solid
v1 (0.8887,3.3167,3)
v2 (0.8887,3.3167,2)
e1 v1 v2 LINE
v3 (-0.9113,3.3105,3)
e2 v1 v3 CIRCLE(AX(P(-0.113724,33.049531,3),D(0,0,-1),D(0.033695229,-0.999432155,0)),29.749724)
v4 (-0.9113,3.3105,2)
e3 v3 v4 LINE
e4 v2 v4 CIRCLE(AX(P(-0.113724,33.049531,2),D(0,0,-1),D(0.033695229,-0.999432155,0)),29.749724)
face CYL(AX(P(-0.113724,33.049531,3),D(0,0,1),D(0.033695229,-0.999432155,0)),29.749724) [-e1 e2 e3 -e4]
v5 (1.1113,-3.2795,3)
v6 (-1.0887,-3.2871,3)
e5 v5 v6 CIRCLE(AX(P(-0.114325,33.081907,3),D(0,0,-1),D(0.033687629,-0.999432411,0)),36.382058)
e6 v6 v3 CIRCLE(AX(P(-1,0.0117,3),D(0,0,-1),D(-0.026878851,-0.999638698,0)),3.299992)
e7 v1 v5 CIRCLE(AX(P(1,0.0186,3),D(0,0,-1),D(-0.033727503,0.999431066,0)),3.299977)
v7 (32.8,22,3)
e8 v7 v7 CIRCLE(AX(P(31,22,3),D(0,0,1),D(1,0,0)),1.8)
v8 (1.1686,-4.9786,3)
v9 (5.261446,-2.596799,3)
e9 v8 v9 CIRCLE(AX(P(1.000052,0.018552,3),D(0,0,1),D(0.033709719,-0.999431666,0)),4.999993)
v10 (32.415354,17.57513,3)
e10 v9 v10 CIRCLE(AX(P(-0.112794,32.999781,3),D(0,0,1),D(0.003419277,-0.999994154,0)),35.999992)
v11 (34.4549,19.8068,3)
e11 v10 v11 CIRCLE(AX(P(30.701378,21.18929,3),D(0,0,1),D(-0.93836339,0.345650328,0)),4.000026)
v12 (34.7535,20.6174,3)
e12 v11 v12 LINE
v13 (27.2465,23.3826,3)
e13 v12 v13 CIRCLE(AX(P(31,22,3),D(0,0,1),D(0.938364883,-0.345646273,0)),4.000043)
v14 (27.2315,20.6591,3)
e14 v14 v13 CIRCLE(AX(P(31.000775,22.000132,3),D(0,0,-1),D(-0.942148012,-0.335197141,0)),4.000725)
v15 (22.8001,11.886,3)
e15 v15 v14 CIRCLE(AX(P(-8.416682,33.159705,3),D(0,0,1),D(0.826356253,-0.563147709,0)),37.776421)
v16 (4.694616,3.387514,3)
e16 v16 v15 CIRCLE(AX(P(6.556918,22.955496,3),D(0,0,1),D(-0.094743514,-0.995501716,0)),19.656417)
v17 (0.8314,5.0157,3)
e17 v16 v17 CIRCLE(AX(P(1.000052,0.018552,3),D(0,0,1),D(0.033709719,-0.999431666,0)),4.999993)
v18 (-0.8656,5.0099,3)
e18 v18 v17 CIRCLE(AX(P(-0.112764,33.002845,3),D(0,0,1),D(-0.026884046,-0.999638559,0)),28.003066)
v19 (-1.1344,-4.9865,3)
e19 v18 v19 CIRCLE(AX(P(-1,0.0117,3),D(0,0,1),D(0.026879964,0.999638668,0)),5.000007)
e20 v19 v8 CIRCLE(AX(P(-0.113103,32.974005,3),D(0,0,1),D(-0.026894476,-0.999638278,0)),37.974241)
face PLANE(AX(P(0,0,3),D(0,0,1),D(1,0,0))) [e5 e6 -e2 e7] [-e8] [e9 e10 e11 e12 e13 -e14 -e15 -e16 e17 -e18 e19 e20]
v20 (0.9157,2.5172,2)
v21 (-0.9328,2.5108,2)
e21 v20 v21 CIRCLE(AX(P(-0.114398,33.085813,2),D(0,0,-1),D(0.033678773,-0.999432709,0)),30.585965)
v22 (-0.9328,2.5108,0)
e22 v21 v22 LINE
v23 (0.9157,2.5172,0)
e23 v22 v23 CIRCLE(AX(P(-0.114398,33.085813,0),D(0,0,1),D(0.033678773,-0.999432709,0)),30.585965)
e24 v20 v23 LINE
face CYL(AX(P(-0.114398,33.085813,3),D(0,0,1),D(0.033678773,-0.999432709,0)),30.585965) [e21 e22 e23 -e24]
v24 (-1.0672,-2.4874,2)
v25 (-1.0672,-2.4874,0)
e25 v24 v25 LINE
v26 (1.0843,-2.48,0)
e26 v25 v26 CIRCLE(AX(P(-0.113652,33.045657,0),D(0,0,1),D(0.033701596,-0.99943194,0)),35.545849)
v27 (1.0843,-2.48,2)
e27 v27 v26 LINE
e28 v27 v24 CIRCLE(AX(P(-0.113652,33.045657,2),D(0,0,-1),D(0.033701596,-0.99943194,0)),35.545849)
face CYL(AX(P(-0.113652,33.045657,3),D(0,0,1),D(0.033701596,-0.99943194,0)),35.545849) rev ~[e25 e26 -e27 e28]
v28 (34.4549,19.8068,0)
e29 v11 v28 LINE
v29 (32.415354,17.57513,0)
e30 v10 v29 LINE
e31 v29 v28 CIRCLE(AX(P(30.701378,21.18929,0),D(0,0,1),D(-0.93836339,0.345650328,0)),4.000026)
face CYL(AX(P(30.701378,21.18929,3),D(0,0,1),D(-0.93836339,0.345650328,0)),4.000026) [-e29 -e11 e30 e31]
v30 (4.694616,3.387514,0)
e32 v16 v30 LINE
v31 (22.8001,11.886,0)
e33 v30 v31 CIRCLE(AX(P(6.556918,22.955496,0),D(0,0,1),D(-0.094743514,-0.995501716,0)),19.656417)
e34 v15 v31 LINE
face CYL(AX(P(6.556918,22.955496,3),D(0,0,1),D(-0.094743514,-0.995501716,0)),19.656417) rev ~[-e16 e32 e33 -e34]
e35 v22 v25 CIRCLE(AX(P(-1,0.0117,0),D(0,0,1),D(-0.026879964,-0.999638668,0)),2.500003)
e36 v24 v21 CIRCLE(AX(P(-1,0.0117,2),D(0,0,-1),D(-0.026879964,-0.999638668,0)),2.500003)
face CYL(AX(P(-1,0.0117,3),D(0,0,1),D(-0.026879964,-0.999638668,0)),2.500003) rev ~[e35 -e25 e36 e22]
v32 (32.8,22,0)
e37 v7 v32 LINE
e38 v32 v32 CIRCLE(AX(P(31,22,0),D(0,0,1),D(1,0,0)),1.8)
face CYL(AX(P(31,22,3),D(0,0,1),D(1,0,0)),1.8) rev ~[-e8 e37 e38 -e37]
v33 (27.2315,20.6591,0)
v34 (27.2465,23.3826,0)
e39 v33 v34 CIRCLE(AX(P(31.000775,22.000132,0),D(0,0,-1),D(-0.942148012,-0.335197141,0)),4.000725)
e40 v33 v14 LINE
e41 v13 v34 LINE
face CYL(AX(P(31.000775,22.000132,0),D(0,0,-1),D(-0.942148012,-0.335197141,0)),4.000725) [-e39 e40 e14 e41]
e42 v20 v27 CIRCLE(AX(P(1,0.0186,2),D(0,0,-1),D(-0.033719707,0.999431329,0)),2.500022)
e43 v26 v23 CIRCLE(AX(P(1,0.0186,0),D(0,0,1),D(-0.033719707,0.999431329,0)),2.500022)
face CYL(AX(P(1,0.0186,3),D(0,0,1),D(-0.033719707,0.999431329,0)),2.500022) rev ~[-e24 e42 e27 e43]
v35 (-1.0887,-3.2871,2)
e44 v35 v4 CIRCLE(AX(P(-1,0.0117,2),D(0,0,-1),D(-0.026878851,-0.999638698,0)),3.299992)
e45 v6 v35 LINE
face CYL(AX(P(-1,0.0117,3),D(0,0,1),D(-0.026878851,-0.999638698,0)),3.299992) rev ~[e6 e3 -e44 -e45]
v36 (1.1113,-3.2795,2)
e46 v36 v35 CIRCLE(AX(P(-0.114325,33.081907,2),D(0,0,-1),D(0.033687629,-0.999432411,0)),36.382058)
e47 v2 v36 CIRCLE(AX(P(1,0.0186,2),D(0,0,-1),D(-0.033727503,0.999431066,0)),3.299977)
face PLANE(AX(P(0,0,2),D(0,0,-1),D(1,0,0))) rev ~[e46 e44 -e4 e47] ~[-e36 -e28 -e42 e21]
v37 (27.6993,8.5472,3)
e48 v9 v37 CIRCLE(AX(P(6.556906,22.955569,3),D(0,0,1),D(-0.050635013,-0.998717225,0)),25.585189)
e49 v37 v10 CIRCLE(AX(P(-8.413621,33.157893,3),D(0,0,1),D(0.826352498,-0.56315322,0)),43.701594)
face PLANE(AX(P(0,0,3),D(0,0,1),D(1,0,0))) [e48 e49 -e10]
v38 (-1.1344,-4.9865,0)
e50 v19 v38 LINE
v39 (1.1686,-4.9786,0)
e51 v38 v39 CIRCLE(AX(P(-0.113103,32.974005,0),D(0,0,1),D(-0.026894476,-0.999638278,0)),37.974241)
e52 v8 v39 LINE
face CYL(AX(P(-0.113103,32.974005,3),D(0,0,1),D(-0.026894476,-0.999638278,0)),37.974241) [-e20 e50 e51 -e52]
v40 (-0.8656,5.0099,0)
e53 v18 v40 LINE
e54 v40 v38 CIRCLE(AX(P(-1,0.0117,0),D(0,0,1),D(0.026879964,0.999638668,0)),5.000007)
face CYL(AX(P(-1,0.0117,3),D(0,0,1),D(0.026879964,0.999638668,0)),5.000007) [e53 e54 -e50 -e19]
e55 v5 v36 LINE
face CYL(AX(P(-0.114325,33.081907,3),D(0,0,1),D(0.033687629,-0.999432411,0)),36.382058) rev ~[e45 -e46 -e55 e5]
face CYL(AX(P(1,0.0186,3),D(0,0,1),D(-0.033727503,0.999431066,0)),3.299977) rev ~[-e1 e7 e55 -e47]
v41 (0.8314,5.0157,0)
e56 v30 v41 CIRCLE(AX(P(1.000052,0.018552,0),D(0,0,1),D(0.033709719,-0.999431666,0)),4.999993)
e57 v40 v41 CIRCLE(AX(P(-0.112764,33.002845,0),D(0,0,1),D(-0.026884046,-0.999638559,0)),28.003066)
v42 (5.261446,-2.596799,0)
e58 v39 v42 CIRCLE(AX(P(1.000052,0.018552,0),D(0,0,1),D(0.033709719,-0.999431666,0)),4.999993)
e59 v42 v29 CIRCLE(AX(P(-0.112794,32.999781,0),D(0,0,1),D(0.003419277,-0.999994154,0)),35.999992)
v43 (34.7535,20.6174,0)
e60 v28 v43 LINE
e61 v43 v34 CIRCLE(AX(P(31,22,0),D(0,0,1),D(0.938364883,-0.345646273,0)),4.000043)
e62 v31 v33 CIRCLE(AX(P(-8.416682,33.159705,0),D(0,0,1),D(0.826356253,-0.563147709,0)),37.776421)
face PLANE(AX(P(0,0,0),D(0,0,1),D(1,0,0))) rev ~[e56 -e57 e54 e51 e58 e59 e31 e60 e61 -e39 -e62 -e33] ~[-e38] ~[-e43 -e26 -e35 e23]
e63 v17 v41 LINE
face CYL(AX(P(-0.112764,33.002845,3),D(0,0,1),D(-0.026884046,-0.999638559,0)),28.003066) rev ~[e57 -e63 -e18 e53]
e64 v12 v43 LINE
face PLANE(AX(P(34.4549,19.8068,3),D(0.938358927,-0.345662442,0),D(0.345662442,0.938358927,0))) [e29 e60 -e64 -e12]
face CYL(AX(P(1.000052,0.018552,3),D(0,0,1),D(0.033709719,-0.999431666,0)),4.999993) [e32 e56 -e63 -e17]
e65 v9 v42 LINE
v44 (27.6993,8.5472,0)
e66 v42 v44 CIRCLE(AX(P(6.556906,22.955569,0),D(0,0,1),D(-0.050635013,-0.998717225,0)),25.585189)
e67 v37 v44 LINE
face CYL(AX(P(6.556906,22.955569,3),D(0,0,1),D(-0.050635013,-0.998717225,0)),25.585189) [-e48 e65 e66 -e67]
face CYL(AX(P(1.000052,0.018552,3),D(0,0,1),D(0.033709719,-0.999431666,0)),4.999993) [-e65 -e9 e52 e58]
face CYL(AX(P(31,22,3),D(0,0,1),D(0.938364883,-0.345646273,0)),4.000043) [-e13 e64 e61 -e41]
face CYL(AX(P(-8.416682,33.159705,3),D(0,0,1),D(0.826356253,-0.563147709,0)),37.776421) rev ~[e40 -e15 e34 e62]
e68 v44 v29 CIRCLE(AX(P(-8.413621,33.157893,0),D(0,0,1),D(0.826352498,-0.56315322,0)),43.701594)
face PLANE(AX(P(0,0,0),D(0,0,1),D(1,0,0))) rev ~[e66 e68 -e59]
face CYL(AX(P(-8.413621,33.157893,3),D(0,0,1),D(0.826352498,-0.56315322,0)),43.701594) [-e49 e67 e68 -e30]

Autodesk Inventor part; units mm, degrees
ref_plane "YZ Plane" through (0, 0, 0) normal (1, 0, 0) x (0, 1, 0)
ref_plane "XZ Plane" through (0, 0, 0) normal (0, 1, 0) x (-1, 0, 0)
ref_plane "XY Plane" through (0, 0, 0) normal (0, 0, 1) x (1, 0, 0)
sketch "Sketch1" plane through (0, 0, 0) normal (0, 0, 1) x (1, 0, 0)
  circle A0 centre (31, 22) radius 1.25
  circle A1 centre (31, 22) radius 3
  arc A2 (0, 0) -> (31, 22) centre (-0.1128, 32.9998) ccw construction
  arc A3 (0.0103, -3) -> (33.8284, 21) centre (-0.1128, 32.9998) ccw
  arc A4 (-0.0103, 3) -> (28.1716, 23) centre (-0.1128, 32.9998) ccw
  arc A5 (-0.0103, 3) -> (0.0103, -3) centre (0, 0) ccw
  arc A6 (33.8284, 21) -> (28.1716, 23) centre (31, 22) ccw
  point P0 (41.5332, 21.1583)
  point P1 (35.8668, 23.1312)
  point P2 (33.8284, 21)
  point P3 (28.1716, 23)
  dimension "d1" = 30
  dimension "d21" = 6
  dimension "d22" = 2.5
  dimension "d23" = 31
  dimension "d24" = 22
extrude "Extrusion1" add sketch "Sketch1" along normal blind 3
sketch "Sketch3" plane through (0, 0, 3) normal (0, 0, 1) x (1, 0, 0)
  arc A0 (-1, 0.0117) -> (1, 0.0186) centre (-0.1128, 32.9998) ccw construction
  arc A1 (-1.1344, -4.9865) -> (1.1686, -4.9786) centre (-0.1128, 32.9998) ccw
  arc A2 (-0.8656, 5.0099) -> (0.8314, 5.0157) centre (-0.1128, 32.9998) ccw
  arc A3 (-0.8656, 5.0099) -> (-1.1344, -4.9865) centre (-1, 0.0117) ccw
  arc A4 (1.1686, -4.9786) -> (0.8314, 5.0157) centre (1, 0.0186) ccw
  arc A5 (0.0103, -3) -> (33.8284, 21) centre (-0.1128, 32.9998) ccw projected
  point P0 (0, 0)
  dimension "d31" = 10
  dimension "d32" = 1
  dimension "d33" = 1
extrude "Extrusion3" add sketch "Sketch3" against normal blind 3
sketch "Sketch4" plane through (0, 0, 3) normal (0, 0, -1) x (1, 0, 0)
  arc A0 (-1.1344, 4.9865) -> (-0.8656, -5.0099) centre (-1, -0.0117) ccw projected
  arc A1 (1.1686, 4.9786) -> (-1.1344, 4.9865) centre (-0.1128, -32.9998) ccw projected
  arc A2 (0.8314, -5.0157) -> (-0.8656, -5.0099) centre (-0.1128, -32.9998) ccw projected
  arc A3 (1, -0.0186) -> (-1, -0.0117) centre (-0.1128, -32.9998) ccw construction
  arc A4 (1.0843, 2.48) -> (-1.0672, 2.4874) centre (-0.1128, -32.9998) ccw
  arc A5 (0.9157, -2.5172) -> (-0.9328, -2.5108) centre (-0.1128, -32.9998) ccw
  arc A6 (0.9157, -2.5172) -> (1.0843, 2.48) centre (1, -0.0186) ccw
  arc A7 (-1.0672, 2.4874) -> (-0.9328, -2.5108) centre (-1, -0.0117) ccw
  arc A8 (28.1716, -23) -> (4.6946, -3.3875) centre (-0.1128, -32.9998) ccw projected
  arc A9 (28.1716, -23) -> (33.8284, -21) centre (31, -22) ccw projected
  arc A10 (33.8284, -21) -> (5.2614, 2.5968) centre (-0.1128, -32.9998) ccw projected
  arc A11 (5.2614, 2.5968) -> (1.1686, 4.9786) centre (1, -0.0186) ccw projected
  arc A12 (0.8314, -5.0157) -> (4.6946, -3.3875) centre (1, -0.0186) ccw projected
  arc A13 (0.8887, -3.3167) -> (-0.9113, -3.3105) centre (-0.1128, -32.9998) ccw
  arc A14 (0.8887, -3.3167) -> (1.1113, 3.2795) centre (1, -0.0186) ccw
  arc A15 (1.1113, 3.2795) -> (-1.0887, 3.2871) centre (-0.1128, -32.9998) ccw
  arc A16 (-1.0887, 3.2871) -> (-0.9113, -3.3105) centre (-1, -0.0117) ccw
  point P0 (0, 0)
  dimension "d43" = 5
  dimension "d52" = 0.8
extrude "Extrusion4" cut sketch "Sketch4" along normal through all contours A6 A5 A7 A4
sketch "Sketch5" plane through (0, 0, 3) normal (0, 0, 1) x (1, 0, 0)
  circle A0 centre (31, 22) radius 1.25 projected
  arc A1 (0, 0) -> (31, 22) centre (-0.1128, 32.9998) ccw construction
  arc A2 (34.7535, 20.6174) -> (27.2465, 23.3826) centre (31, 22) ccw
  arc A3 (26.9479, 22.5719) -> (34.4549, 19.8068) centre (30.7014, 21.1893) ccw
  line L0 (30.0441, 21.4413) -> (31.2665, 20.9727)
  line L1 (32.5586, 21.449) -> (29.5201, 22.5232)
  line L2 (26.9479, 22.5719) -> (27.2465, 23.3826)
  line L3 (34.4549, 19.8068) -> (34.7535, 20.6174)
  circle A4 centre (31, 22) radius 1.8
  dimension "d44" = 8
  dimension "d46" = 1.5
  dimension "d47" = 3.6
extrude "Extrusion5" cut sketch "Sketch5" against normal up to surface (3 mm away) contours A4
extrude "Extrusion6" add sketch "Sketch5" against normal up to surface (3 mm away) contours L3 A3 L2 A2
extrude "Extrusion7" cut sketch "Sketch4" along normal blind 1 contours A13 A16 A15 A14
sketch "Sketch6" plane through (0, 0, 0) normal (0, 0, -1) x (-1, 0, 0)
  circle A0 centre (-31, 22) radius 1.8 projected
  arc A1 (-32.4154, 17.5752) -> (-5.2614, -2.5968) centre (0.1128, 32.9998) ccw projected
  arc A2 (-5.2614, -2.5968) -> (-1.1686, -4.9786) centre (-1, 0.0186) ccw projected
  arc A3 (-1.1686, -4.9786) -> (1.1344, -4.9865) centre (0.1128, 32.9998) ccw projected
  arc A4 (1.1344, -4.9865) -> (0.8656, 5.0099) centre (1, 0.0117) ccw projected
  arc A5 (-0.8314, 5.0157) -> (0.8656, 5.0099) centre (0.1128, 32.9998) ccw projected
  arc A6 (-0.8314, 5.0157) -> (-4.6946, 3.3875) centre (-1, 0.0186) ccw projected
  arc A7 (-26.899, 19.9475) -> (-4.6946, 3.3875) centre (0.1128, 32.9998) ccw projected
  arc A8 (-26.899, 19.9475) -> (-26.9479, 22.5719) centre (-30.7014, 21.1893) ccw projected
  line L0 (-26.9479, 22.5719) -> (-27.2465, 23.3826) projected
  arc A9 (-27.2465, 23.3826) -> (-34.7535, 20.6174) centre (-31, 22) ccw projected
  line L1 (-34.7535, 20.6174) -> (-34.4549, 19.8068) projected
  arc A10 (-34.4549, 19.8068) -> (-32.4154, 17.5752) centre (-30.7014, 21.1893) ccw projected
  arc A11 (-1.0843, -2.48) -> (1.0672, -2.4874) centre (0.1128, 32.9998) ccw projected
  arc A12 (-0.9157, 2.5172) -> (-1.0843, -2.48) centre (-1, 0.0186) ccw projected
  arc A13 (-0.9157, 2.5172) -> (0.9328, 2.5108) centre (0.1128, 32.9998) ccw projected
  arc A14 (1.0672, -2.4874) -> (0.9328, 2.5108) centre (1, 0.0117) ccw projected
  arc A15 (-27.2465, 23.3826) -> (-34.7535, 20.6174) centre (-31, 22) ccw projected
  arc A16 (-27.2315, 20.6591) -> (-27.2465, 23.3826) centre (-31, 22) ccw
  arc A17 (-26.899, 19.9475) -> (-4.6946, 3.3875) centre (0.1128, 32.9998) ccw projected
  arc A18 (-27.2315, 20.6591) -> (-26.899, 19.9475) centre (0.1128, 32.9998) ccw
  arc A19 (-26.899, 19.9475) -> (-4.6946, 3.3875) centre (0.1128, 32.9998) ccw projected
  point P0 (0, 0)
extrude "Extrusion8" cut sketch "Sketch6" against normal up to surface (3 mm away) contours L0 A8 A18 A16
sketch "Sketch7" plane through (0, 0, 3) normal (0, 0, 1) x (1, 0, 0)
  arc A0 (34.7535, 20.6174) -> (27.2315, 20.6591) centre (31, 22) ccw projected
  arc A1 (4.6946, 3.3875) -> (27.2315, 20.6591) centre (-0.1128, 32.9998) ccw projected
  arc A2 (4.6946, 3.3875) -> (0.8314, 5.0157) centre (1, 0.0186) ccw projected
  arc A3 (-0.8656, 5.0099) -> (0.8314, 5.0157) centre (-0.1128, 32.9998) ccw projected
  arc A4 (-0.8656, 5.0099) -> (-1.1344, -4.9865) centre (-1, 0.0117) ccw projected
  arc A5 (-1.1344, -4.9865) -> (1.1686, -4.9786) centre (-0.1128, 32.9998) ccw projected
  arc A6 (1.1686, -4.9786) -> (5.2614, -2.5968) centre (1, 0.0186) ccw projected
  arc A7 (5.2614, -2.5968) -> (32.4154, 17.5752) centre (-0.1128, 32.9998) ccw projected
  arc A8 (32.4154, 17.5752) -> (34.4549, 19.8068) centre (30.7014, 21.1893) ccw projected
  line L0 (34.4549, 19.8068) -> (34.7535, 20.6174) projected
  circle A9 centre (31, 22) radius 1.8 projected
  arc A10 (-1.0887, -3.2871) -> (1.1113, -3.2795) centre (-0.1128, 32.9998) ccw projected
  arc A11 (-0.9113, 3.3105) -> (-1.0887, -3.2871) centre (-1, 0.0117) ccw projected
  arc A12 (-0.9113, 3.3105) -> (0.8887, 3.3167) centre (-0.1128, 32.9998) ccw projected
  arc A13 (1.1113, -3.2795) -> (0.8887, 3.3167) centre (1, 0.0186) ccw projected
  arc A14 (5.2614, -2.5968) -> (32.4154, 17.5752) centre (-0.1128, 32.9998) ccw projected
  arc A15 (5.2614, -2.5968) -> (27.6993, 8.5472) centre (6.5569, 22.9556) ccw
  arc A16 (27.6993, 8.5472) -> (32.4154, 17.5752) centre (-8.4143, 33.1583) ccw
  arc A17 (4.6946, 3.3875) -> (22.8001, 11.886) centre (6.5569, 22.9556) ccw
  arc A18 (34.7535, 20.6174) -> (27.2315, 20.6591) centre (31, 22) ccw projected
  arc A19 (22.8001, 11.886) -> (27.2315, 20.6591) centre (-8.4143, 33.1583) ccw
  line L1 (5.2614, -2.5968) -> (4.6946, 3.3875)
  line L2 (4.6946, 3.3875) -> (2.1704, 20.8058)
  line L3 (2.1704, 20.8058) -> (15.0141, 27.6003)
  line L4 (15.0141, 27.6003) -> (27.2315, 20.6591)
  point P0 (0, 0)
extrude "Extrusion9" cut sketch "Sketch7" against normal up to surface (3 mm away) contours A19 A17 A1 | A1 L2 L3 L4
extrude "Extrusion10" add sketch "Sketch7" against normal up to surface (3 mm away) contours A16 A15 A7
